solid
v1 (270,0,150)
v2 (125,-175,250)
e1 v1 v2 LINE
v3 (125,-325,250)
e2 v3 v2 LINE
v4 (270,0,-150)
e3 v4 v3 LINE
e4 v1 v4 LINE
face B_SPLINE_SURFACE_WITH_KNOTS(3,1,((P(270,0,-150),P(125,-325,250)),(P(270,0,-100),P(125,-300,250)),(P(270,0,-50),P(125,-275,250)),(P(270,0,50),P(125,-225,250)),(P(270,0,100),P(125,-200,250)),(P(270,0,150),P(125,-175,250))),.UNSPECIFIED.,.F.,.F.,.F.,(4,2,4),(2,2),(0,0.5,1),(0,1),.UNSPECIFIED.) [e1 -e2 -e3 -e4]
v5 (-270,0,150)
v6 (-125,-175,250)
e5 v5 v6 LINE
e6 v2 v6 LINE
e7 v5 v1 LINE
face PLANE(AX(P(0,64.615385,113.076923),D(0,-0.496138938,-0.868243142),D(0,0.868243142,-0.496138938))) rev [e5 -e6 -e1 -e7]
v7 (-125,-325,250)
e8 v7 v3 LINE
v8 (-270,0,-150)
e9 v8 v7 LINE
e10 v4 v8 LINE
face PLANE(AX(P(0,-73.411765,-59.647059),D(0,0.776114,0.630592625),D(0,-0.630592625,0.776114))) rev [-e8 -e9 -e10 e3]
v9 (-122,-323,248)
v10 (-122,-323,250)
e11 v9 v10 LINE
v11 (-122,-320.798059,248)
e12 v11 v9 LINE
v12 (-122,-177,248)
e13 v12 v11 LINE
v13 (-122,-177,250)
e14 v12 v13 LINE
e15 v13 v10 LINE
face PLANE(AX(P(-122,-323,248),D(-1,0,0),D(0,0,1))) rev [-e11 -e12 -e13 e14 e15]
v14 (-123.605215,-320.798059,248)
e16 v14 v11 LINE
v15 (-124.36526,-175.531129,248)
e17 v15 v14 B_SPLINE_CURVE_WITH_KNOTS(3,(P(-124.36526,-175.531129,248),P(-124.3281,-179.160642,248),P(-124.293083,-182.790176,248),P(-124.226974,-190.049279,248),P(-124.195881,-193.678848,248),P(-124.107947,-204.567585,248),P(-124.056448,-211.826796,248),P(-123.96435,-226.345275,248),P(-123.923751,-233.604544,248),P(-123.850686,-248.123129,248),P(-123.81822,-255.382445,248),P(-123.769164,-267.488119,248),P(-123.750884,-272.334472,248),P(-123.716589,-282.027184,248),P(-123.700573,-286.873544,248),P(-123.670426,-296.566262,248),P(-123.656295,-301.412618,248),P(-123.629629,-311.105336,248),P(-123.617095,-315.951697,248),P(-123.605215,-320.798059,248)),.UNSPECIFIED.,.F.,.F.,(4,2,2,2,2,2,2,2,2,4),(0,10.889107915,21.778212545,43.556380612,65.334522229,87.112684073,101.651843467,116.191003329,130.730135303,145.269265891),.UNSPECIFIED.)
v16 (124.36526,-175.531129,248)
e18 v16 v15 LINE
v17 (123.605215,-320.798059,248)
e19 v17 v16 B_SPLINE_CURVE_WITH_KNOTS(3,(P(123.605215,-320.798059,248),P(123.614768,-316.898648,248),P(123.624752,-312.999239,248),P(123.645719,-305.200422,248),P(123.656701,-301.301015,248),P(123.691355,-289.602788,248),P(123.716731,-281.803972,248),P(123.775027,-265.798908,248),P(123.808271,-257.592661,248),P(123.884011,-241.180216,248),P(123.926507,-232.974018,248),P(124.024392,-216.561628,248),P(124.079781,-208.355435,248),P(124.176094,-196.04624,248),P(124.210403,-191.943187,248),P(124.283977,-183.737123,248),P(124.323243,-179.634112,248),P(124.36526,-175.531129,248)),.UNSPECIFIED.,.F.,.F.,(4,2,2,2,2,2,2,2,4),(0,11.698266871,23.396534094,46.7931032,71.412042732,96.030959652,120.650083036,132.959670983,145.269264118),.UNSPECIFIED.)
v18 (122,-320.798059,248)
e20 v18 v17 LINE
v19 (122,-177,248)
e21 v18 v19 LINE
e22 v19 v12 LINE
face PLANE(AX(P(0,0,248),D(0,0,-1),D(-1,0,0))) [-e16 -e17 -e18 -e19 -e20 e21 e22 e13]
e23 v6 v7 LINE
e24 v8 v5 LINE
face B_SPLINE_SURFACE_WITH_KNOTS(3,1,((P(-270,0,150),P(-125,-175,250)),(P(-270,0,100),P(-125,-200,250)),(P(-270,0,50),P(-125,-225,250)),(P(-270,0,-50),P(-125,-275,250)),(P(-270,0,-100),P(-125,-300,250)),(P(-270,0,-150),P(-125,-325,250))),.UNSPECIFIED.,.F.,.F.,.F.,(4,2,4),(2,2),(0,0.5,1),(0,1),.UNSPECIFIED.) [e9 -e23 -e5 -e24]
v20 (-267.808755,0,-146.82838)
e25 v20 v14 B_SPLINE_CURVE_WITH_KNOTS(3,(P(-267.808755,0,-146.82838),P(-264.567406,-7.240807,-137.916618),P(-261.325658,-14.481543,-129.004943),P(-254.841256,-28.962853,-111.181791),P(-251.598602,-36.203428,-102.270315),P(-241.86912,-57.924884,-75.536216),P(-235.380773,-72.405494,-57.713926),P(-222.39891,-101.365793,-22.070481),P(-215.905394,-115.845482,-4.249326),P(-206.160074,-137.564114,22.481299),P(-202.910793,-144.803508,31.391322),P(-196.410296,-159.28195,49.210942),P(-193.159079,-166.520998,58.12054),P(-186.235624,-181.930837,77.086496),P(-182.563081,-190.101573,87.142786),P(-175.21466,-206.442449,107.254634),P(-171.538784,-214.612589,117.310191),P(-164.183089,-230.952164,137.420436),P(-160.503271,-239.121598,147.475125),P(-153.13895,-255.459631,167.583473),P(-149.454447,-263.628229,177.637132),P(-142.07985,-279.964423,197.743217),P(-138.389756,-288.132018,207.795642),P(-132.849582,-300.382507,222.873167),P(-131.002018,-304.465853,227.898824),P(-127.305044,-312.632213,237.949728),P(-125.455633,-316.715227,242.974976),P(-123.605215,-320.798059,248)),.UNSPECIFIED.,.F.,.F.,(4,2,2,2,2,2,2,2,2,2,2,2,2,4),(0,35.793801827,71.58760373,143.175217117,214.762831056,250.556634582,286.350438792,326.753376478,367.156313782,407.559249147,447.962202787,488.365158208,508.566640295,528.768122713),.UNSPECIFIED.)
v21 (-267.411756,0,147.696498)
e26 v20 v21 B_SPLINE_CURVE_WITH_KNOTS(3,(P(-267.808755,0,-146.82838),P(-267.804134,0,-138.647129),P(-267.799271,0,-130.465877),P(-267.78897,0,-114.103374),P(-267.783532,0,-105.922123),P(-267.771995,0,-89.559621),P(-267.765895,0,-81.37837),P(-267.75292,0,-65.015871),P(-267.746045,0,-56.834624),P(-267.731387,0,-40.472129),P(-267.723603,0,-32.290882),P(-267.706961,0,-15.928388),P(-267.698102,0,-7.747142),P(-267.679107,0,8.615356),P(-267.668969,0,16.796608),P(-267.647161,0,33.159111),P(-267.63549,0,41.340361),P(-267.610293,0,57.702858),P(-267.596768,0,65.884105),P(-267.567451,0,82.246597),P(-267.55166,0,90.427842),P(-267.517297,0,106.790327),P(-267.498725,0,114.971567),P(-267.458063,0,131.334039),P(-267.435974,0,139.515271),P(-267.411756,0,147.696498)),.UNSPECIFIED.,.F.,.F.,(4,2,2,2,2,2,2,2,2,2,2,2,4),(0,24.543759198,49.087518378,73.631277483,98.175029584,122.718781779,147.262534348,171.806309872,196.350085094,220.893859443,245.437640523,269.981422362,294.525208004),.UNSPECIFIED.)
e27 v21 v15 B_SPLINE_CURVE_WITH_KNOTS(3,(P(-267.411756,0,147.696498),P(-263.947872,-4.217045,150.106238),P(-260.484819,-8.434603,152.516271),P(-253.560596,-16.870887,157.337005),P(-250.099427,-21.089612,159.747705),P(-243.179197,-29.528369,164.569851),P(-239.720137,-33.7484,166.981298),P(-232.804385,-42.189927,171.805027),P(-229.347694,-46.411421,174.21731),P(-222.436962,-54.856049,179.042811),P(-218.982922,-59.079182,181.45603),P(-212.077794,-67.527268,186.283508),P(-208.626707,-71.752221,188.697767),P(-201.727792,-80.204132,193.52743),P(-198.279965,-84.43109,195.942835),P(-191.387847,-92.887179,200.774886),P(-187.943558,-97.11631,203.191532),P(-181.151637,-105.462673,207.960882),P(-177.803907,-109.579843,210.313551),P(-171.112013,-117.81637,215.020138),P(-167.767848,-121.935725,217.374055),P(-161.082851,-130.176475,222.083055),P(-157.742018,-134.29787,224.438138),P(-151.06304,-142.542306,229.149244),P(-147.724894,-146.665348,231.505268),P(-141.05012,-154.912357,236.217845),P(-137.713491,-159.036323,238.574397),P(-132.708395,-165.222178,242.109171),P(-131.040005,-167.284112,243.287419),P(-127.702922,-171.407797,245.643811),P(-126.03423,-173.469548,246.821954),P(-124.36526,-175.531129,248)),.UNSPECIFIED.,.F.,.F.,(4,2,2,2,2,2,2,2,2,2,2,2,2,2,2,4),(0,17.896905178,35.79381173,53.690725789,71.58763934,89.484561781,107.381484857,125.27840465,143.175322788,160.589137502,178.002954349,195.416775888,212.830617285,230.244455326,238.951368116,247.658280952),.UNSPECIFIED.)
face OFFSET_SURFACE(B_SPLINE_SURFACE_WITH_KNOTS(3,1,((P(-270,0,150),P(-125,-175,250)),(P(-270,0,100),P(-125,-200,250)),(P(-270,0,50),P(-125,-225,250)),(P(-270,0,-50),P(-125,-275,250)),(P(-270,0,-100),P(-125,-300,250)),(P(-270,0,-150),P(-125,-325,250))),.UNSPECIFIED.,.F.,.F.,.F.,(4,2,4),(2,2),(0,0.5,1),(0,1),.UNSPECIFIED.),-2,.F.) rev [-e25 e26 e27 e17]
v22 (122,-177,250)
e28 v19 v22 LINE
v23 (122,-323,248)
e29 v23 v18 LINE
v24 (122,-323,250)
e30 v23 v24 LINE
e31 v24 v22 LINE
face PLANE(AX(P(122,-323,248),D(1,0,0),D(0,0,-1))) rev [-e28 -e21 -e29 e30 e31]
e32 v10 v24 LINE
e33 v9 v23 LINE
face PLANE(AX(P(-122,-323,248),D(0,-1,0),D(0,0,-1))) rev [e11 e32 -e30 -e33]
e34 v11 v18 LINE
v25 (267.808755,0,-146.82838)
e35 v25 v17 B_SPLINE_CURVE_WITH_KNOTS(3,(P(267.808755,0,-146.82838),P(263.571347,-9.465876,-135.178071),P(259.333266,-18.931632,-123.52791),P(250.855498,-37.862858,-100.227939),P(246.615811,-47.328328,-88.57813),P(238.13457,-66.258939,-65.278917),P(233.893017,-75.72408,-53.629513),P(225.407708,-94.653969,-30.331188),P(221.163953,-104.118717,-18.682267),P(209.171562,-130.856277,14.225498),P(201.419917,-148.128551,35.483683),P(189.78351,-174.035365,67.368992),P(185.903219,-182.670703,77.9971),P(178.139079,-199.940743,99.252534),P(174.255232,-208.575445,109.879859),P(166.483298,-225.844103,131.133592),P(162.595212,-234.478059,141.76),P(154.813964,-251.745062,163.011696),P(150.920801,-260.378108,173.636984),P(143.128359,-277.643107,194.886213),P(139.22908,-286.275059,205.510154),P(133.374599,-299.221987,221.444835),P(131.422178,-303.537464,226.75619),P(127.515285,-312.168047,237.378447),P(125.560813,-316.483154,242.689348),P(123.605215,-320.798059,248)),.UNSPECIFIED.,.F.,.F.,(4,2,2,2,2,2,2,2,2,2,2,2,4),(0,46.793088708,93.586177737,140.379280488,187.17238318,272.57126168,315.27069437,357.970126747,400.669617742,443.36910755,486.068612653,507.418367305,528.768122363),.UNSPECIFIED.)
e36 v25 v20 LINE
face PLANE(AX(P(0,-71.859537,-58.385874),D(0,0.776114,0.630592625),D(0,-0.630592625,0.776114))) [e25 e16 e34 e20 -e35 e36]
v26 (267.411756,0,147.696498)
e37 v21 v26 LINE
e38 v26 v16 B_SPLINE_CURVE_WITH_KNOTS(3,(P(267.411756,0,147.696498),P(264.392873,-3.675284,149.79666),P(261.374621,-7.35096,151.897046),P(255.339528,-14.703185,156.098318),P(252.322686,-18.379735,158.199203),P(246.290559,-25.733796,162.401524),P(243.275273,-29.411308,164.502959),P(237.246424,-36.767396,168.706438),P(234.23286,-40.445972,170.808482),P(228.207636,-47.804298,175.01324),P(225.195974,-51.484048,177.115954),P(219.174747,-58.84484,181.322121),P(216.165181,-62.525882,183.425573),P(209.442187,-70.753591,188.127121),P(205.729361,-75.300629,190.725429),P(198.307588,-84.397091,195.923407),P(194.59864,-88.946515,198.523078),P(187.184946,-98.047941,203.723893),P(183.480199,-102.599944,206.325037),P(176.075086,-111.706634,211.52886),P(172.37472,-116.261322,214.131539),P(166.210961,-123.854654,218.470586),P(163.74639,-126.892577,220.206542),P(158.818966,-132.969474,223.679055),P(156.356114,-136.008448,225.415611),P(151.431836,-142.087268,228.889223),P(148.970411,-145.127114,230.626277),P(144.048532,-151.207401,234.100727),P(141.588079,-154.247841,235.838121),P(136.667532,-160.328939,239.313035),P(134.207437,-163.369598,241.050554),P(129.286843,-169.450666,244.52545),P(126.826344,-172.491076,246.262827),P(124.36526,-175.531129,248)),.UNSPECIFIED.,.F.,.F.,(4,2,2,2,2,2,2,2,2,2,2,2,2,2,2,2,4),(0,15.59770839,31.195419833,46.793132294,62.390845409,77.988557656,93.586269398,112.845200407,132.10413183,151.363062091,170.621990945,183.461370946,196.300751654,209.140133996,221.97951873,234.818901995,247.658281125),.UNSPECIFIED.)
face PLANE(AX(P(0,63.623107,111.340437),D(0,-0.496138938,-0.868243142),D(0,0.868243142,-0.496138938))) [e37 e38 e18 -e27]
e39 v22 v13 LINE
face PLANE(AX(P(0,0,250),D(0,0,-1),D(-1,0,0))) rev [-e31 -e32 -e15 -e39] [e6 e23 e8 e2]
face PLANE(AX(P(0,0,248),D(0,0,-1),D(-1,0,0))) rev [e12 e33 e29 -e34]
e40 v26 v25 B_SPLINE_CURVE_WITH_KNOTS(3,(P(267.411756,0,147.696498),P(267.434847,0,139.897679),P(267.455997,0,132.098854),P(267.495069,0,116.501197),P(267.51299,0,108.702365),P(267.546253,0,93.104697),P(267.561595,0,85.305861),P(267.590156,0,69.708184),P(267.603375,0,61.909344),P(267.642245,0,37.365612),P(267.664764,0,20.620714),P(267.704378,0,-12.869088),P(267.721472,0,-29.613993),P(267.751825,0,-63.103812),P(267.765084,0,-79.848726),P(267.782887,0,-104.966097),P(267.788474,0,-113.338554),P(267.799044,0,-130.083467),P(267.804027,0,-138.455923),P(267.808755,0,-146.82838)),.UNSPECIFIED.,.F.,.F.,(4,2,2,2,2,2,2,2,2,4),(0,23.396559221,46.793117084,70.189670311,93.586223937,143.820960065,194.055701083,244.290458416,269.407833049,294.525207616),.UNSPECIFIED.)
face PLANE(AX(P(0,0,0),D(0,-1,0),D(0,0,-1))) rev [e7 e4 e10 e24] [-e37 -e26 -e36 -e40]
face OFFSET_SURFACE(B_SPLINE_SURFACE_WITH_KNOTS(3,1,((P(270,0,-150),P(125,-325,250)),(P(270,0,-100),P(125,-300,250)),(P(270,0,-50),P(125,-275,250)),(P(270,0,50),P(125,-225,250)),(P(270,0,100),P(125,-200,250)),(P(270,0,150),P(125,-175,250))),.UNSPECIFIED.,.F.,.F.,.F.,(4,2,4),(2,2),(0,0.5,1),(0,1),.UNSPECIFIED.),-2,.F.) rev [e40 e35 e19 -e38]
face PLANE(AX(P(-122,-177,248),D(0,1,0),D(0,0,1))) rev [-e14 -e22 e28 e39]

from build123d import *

# Parameters (mm, degrees)
SHELL1_T           = -2
SKETCH4_W          = 244
SKETCH4_H          = 146
CUT_EXTRUDE1_DEPTH = 2


with BuildPart() as part:
    # Loft1: read off the stored shape, not the designer's step
    # Loft1: loft between two sections, ruled curve by curve
    loft1_from = [
        Edge.make_bspline([(270, 0, -150), (270, 0, -100), (270, 0, -50), (270, 0, 50), (270, 0, 100), (270, 0, 150)], [0, 0, 0, 0, 0.5, 0.5, 1, 1, 1, 1], 3),
        Edge.make_bspline([(-270, 0, 150), (-270, 0, 100), (-270, 0, 50), (-270, 0, -50), (-270, 0, -100), (-270, 0, -150)], [0, 0, 0, 0, 0.5, 0.5, 1, 1, 1, 1], 3),
        Edge.make_line((-270, 0, 150), (270, 0, 150)),
        Edge.make_line((270, 0, -150), (-270, 0, -150)),
    ]
    loft1_to = [
        Edge.make_bspline([(125, -325, 250), (125, -300, 250), (125, -275, 250), (125, -225, 250), (125, -200, 250), (125, -175, 250)], [0, 0, 0, 0, 0.5, 0.5, 1, 1, 1, 1], 3),
        Edge.make_bspline([(-125, -175, 250), (-125, -200, 250), (-125, -225, 250), (-125, -275, 250), (-125, -300, 250), (-125, -325, 250)], [0, 0, 0, 0, 0.5, 0.5, 1, 1, 1, 1], 3),
        Edge.make_line((-125, -175, 250), (125, -175, 250)),
        Edge.make_line((125, -325, 250), (-125, -325, 250)),
    ]
    loft1 = Solid(Shell([*[Face.make_surface_from_curves(loft1_from[k], loft1_to[k]) for k in range(4)], Face(Wire(loft1_from)), Face(Wire(loft1_to))]))
    add(loft1)

    # Shell1
    shell1_openings = [part.faces().sort_by_distance(p)[0] for p in [
        (0, 0, 0),
    ]]
    offset(amount=SHELL1_T, openings=shell1_openings, kind=Kind.INTERSECTION)

    # Sketch4 → Cut-Extrude1 (cut)
    with BuildSketch(Plane.XY.offset(250)):
        with Locations((0, -250)):
            Rectangle(SKETCH4_W, SKETCH4_H)
    extrude(amount=-CUT_EXTRUDE1_DEPTH, mode=Mode.SUBTRACT)


solid = part.part
